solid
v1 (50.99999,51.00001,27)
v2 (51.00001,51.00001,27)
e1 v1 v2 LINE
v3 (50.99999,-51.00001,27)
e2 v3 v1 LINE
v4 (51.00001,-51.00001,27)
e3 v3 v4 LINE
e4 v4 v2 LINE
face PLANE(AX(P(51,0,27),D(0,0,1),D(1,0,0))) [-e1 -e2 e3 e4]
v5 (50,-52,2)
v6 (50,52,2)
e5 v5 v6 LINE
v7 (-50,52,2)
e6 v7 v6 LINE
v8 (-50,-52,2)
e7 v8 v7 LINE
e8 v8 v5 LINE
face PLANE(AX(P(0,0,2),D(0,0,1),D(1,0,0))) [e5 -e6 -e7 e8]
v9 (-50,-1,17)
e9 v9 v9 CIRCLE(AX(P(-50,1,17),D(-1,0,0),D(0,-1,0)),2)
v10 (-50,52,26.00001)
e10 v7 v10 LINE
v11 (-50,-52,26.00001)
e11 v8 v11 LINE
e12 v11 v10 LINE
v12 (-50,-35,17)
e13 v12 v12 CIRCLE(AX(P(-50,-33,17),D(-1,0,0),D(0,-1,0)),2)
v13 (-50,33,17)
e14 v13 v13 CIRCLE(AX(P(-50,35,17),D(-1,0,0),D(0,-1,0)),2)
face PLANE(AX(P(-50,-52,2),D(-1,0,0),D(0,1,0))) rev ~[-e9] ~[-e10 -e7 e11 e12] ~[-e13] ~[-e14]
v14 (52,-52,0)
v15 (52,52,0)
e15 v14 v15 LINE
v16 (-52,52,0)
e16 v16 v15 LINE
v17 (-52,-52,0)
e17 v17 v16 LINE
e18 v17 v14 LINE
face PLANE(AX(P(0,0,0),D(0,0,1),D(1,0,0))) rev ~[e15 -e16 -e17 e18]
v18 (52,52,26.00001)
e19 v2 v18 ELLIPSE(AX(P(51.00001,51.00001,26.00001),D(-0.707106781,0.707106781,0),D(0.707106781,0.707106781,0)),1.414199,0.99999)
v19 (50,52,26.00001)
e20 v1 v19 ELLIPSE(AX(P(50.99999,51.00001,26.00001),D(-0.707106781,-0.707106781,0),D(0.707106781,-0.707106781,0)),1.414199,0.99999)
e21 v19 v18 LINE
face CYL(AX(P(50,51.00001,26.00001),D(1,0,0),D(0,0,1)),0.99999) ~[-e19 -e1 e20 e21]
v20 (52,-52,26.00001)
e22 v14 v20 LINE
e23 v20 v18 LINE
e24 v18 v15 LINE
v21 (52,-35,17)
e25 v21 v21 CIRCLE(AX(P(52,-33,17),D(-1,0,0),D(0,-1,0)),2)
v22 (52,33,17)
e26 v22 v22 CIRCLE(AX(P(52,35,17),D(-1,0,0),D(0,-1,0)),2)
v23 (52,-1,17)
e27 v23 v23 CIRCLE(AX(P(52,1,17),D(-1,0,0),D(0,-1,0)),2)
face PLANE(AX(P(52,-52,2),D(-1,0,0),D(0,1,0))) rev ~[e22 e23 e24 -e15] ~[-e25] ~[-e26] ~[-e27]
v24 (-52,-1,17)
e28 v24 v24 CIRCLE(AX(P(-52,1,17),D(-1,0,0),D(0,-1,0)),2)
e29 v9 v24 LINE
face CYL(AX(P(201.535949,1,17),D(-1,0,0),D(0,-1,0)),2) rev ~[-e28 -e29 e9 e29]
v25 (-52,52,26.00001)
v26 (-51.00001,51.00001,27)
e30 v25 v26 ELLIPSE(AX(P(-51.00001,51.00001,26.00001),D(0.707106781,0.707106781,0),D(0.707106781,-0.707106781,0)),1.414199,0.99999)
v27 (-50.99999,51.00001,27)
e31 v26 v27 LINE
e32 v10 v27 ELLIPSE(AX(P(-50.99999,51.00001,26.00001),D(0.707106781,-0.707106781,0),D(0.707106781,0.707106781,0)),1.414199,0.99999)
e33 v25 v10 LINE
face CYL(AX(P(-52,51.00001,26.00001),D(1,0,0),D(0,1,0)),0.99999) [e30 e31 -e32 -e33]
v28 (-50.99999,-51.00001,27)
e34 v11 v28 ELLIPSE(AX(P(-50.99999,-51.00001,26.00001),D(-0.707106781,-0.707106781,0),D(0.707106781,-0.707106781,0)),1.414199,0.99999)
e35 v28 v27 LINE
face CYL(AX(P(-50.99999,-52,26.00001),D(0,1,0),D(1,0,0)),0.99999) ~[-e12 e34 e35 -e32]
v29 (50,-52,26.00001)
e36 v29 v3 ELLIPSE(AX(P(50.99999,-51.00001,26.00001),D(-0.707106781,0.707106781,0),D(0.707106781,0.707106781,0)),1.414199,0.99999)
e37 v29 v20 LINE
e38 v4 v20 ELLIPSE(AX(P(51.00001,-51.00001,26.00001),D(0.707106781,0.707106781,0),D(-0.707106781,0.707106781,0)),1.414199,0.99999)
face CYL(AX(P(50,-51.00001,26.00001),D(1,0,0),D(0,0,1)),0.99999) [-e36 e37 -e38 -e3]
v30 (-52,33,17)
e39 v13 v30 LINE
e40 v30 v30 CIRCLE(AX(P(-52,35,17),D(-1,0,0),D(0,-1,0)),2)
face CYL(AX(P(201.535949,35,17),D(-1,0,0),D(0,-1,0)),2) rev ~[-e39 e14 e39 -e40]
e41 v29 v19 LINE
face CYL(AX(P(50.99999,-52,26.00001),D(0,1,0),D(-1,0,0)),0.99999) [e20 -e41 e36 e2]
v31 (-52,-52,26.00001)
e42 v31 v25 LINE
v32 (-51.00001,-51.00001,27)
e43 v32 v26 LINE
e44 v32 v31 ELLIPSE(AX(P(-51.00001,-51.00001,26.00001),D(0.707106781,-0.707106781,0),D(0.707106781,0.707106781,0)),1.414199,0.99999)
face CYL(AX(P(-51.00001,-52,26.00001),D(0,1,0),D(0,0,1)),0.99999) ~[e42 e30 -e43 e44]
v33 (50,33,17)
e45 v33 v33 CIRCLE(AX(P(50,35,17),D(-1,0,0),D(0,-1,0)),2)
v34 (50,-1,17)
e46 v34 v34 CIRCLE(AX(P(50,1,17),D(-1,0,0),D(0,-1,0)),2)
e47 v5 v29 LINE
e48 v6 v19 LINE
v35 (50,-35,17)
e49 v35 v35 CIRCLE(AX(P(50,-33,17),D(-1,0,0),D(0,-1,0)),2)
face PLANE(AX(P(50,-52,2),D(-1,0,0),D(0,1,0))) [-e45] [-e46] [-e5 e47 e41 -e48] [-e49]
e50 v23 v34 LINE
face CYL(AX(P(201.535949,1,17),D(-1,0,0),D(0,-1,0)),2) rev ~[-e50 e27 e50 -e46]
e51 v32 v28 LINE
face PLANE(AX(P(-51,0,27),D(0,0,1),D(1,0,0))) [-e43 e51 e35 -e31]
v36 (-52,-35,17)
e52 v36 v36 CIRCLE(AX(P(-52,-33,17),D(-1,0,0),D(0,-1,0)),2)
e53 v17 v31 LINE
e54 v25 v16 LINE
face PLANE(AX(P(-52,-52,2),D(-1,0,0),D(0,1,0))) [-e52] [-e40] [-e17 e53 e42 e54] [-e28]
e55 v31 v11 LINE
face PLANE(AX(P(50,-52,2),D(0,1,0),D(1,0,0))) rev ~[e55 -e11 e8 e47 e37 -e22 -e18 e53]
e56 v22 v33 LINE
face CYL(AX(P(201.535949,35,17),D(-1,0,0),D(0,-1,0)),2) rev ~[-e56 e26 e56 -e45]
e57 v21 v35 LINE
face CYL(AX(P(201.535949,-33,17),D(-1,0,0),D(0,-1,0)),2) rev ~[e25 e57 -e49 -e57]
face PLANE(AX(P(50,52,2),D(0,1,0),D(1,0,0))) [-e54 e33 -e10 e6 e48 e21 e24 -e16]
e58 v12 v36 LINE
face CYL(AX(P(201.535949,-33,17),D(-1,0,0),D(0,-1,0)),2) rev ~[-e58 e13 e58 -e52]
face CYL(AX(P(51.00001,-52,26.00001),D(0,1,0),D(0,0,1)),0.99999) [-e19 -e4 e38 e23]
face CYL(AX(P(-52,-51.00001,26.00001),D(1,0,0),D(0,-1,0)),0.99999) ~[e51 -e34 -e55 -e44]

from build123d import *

# Parameters (mm, degrees)
F0_W     = 104
F0_H     = 104
F1_DEPTH = 2
F2_W     = 2
F2_H     = 104
F3_DEPTH = 25
F4_W     = 2
F4_H     = 104
F5_DEPTH = 25
F6_R     = 0.99999
F7_R     = 0.99999
F9_D     = 4
F11_D    = 4
F13_D    = 4


# Not quite as in the source:
# - a fillet or chamfer is up to 0.001 mm smaller than in the source, because OpenCascade refuses the exact size


with BuildPart() as f1:
    # F0 (on Top) → F1 (new body)
    with BuildSketch(Plane.XY):
        Rectangle(F0_W, F0_H)
    extrude(amount=F1_DEPTH)

    # F2 (on face) → F3 (join)
    with BuildSketch(Plane.XY.offset(2)):
        with Locations((-51, 0)):
            Rectangle(F2_W, F2_H)
    extrude(amount=F3_DEPTH)

    # F4 (on face) → F5 (join)
    with BuildSketch(Plane.XY.offset(2)):
        with Locations((51, 0)):
            Rectangle(F4_W, F4_H)
    extrude(amount=F5_DEPTH)

    # F6 (radius 1 in the source; OpenCascade refuses exactly that, so slightly less here)
    f6_edges = [f1.edges().sort_by_distance(p)[0] for p in [
        (52, 0, 27),
        (51, 52, 27),
        (50, 0, 27),
        (51, -52, 27),
    ]]
    fillet(f6_edges, radius=F6_R)

    # F7 (radius 1 in the source; OpenCascade refuses exactly that, so slightly less here)
    f7_edges = [f1.edges().sort_by_distance(p)[0] for p in [
        (-51, 52, 27),
        (-52, 0, 27),
        (-51, -52, 27),
        (-50, 0, 27),
    ]]
    fillet(f7_edges, radius=F7_R)

    # F9 (through all)
    with Locations(Plane.YZ.offset(52)):
        with Locations((-33, 17)):
            Hole(F9_D / 2)

    # F11 (through all)
    with Locations(Plane.YZ.offset(52)):
        with Locations((1, 17)):
            Hole(F11_D / 2)

    # F13 (through all)
    with Locations(Plane.YZ.offset(52)):
        with Locations((35, 17)):
            Hole(F13_D / 2)


solid = f1.part
